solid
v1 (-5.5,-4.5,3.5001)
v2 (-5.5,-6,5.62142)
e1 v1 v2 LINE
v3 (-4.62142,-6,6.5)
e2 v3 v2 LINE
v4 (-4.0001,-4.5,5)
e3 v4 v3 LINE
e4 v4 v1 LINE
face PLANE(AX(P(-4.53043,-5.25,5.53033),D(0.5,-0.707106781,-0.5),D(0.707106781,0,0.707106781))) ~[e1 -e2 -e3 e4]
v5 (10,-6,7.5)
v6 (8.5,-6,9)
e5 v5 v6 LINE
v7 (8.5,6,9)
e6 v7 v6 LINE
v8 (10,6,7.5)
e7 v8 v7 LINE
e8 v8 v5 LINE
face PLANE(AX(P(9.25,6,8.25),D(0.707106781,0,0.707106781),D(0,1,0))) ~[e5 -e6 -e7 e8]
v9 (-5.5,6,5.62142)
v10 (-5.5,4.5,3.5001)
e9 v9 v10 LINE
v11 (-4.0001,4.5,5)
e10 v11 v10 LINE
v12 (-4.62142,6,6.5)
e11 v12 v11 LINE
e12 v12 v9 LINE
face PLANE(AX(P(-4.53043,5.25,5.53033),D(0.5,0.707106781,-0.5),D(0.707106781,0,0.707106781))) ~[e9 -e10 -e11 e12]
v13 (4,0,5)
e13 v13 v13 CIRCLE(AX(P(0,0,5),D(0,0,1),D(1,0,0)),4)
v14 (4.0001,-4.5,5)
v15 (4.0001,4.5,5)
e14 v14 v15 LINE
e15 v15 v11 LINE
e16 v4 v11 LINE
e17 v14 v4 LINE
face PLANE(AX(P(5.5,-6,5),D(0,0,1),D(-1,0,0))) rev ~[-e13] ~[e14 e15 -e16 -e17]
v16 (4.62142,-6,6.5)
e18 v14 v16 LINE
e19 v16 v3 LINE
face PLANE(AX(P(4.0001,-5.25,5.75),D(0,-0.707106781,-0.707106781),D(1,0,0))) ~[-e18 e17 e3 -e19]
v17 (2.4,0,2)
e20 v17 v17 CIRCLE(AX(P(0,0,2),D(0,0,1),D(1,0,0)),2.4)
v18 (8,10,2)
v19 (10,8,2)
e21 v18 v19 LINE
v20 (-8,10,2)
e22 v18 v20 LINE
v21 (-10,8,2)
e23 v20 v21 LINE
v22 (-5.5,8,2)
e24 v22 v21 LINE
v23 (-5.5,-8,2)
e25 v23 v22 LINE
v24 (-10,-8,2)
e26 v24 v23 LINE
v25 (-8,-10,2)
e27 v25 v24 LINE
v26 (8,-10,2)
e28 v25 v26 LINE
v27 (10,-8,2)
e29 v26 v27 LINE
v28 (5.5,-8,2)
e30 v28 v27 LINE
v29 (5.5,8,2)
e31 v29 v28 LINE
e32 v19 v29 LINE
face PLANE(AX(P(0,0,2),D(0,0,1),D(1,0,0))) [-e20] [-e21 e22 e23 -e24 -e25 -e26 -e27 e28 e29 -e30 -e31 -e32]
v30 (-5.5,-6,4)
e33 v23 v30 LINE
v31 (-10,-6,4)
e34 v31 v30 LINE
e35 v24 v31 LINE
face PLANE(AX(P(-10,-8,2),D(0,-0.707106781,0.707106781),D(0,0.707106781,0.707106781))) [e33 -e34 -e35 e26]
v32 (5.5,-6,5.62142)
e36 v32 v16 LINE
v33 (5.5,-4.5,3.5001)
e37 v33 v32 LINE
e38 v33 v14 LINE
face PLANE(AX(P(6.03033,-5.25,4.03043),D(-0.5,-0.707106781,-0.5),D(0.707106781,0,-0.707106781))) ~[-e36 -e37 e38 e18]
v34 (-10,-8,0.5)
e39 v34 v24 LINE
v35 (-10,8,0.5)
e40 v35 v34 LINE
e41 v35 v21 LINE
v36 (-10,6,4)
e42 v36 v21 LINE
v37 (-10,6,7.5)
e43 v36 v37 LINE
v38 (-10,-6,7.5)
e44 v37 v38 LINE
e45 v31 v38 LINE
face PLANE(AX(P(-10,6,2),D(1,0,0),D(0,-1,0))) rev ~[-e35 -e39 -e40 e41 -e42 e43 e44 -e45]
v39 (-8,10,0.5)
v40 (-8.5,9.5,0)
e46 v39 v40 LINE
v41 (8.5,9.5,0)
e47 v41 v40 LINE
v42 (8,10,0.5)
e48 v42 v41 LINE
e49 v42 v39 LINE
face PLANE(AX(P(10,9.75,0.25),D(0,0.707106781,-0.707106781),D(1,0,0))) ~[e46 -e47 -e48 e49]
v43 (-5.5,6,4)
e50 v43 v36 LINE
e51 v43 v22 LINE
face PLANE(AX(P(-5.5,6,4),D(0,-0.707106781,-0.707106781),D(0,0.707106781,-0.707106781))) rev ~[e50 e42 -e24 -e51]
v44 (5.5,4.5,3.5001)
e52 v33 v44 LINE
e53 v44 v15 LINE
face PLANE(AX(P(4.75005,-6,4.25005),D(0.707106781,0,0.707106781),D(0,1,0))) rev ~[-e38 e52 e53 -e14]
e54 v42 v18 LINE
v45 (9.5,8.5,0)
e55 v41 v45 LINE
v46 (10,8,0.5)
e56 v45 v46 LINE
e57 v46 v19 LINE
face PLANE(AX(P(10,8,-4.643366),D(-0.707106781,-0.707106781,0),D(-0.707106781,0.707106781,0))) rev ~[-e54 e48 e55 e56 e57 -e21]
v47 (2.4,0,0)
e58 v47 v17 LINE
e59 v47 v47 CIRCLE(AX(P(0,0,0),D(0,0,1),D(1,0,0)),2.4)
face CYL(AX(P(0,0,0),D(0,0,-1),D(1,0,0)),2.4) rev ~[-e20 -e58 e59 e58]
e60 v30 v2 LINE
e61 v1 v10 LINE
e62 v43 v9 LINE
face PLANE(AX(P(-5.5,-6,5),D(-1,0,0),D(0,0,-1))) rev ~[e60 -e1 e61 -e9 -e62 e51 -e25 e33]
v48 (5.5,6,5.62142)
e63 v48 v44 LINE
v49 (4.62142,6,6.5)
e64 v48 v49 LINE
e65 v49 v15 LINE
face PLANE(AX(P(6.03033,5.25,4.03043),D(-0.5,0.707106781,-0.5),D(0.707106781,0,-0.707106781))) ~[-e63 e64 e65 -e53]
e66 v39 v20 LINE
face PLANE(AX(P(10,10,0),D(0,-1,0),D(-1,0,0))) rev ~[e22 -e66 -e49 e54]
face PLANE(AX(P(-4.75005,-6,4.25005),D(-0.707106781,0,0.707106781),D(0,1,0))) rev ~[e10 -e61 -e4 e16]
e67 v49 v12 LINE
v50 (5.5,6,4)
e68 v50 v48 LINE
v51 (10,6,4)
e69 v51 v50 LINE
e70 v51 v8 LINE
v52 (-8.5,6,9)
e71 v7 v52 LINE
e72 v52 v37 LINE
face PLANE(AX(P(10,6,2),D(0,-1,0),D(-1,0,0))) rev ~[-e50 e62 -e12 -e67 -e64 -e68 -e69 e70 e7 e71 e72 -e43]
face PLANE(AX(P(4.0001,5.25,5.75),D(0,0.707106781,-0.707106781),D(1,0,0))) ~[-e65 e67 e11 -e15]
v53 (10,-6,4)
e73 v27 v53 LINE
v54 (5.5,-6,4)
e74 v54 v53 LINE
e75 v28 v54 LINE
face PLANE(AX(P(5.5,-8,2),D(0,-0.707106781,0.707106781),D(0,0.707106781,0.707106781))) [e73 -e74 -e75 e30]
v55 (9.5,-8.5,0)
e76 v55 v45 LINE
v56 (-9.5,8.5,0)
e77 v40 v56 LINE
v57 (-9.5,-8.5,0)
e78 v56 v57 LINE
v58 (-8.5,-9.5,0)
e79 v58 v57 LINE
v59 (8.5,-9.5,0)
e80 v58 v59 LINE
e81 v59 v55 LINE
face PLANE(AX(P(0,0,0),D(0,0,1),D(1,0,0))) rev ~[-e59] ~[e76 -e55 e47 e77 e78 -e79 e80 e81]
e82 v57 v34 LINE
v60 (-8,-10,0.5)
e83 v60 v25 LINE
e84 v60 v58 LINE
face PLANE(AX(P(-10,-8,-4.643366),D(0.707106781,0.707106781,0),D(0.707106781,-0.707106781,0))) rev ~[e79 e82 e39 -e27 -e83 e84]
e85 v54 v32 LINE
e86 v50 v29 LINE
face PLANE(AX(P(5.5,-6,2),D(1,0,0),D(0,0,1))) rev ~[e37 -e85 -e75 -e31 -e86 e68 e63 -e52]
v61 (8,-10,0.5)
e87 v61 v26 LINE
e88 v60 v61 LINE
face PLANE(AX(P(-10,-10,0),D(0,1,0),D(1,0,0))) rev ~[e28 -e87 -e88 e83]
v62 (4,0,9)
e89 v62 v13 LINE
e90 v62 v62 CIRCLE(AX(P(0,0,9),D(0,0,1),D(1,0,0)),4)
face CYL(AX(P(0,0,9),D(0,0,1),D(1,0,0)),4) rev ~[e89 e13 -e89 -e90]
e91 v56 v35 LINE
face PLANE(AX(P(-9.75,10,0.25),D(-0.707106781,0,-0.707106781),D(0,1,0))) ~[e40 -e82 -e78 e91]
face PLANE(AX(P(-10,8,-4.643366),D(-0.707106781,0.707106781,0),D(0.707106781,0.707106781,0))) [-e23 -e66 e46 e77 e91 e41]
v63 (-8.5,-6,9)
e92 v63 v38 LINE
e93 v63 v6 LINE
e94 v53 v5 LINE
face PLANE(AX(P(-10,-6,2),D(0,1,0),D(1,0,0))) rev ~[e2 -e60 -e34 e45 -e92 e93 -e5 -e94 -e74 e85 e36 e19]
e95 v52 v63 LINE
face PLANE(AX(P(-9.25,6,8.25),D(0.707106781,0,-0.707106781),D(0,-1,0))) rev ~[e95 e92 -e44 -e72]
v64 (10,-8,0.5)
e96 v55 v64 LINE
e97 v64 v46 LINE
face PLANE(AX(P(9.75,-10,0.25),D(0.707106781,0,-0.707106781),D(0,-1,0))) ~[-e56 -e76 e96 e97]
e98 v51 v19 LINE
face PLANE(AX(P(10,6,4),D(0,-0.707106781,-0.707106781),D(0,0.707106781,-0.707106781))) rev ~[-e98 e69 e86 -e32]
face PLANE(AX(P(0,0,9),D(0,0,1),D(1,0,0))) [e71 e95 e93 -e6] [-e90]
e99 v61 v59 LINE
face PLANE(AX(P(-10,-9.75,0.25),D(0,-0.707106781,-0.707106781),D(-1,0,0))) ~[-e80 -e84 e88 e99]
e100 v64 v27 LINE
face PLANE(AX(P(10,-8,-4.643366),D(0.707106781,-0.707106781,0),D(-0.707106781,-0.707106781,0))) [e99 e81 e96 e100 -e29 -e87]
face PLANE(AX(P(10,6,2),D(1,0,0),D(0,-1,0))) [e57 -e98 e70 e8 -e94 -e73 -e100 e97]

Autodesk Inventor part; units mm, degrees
ref_plane "YZ Plane" through (0, 0, 0) normal (1, 0, 0) x (0, 1, 0)
ref_plane "XZ Plane" through (0, 0, 0) normal (0, 1, 0) x (-1, 0, 0)
ref_plane "XY Plane" through (0, 0, 0) normal (0, 0, 1) x (1, 0, 0)
sketch "Sketch1" plane through (0, 0, 0) normal (0, 0, 1) x (1, 0, 0)
  line L0 (-10, -10) -> (10, -10)
  line L1 (10, -10) -> (10, 10)
  line L2 (10, 10) -> (-10, 10)
  line L3 (-10, 10) -> (-10, -10)
  line L4 (-10, -10) -> (10, 10) construction
  line L5 (10, -10) -> (-10, 10) construction
  circle A0 centre (0, 0) radius 2.4
  dimension "d0" = 20
  dimension "d1" = 20
  dimension "d2" = 4.8
extrude "Extrusion1" add sketch "Sketch1" along normal blind 2
chamfer "Chamfer1" distance 0.5 angle 45 4 edges at (10, 0, 0) (0, 10, 0) (-10, 0, 0) (0, -10, 0)
sketch "Sketch2" plane through (0, 0, 2) normal (0, 0, 1) x (1, 0, 0)
  line L0 (10, 10) -> (10, -10) projected
  line L1 (-10, -6) -> (10, -6)
  line L2 (10, -6) -> (10, 6)
  line L3 (10, 6) -> (-10, 6)
  line L4 (-10, 6) -> (-10, -6)
  line L5 (-10, -6) -> (10, 6) construction
  line L6 (10, -6) -> (-10, 6) construction
  point P0 (0, 0)
  point P1 (10, -6)
  dimension "d8" = 12
extrude "Extrusion2" add sketch "Sketch2" along normal blind 7
sketch "Sketch5" plane through (-10, -6, 2) normal (0, -1, 0) x (1, 0, 0)
  line L0 (20, 0) -> (0, 0) projected
  line L1 (4.5, 0) -> (15.5, 0)
  line L2 (15.5, 0) -> (15.5, 3)
  line L3 (15.5, 3) -> (4.5, 3)
  line L4 (4.5, 3) -> (4.5, 0)
  line L5 (0, 0) -> (0, 7) projected
  line L6 (20, 0) -> (20, 7) projected
  point P0 (10, -2)
  dimension "d18" = 3
  dimension "d19" = 4.5
  dimension "d20" = 4.5
extrude "Extrusion4" cut sketch "Sketch5" against normal through all
sketch "Sketch6" plane through (0, 0, 9) normal (0, 0, 1) x (1, 0, 0)
  circle A0 centre (0, 0) radius 2.4 construction
  circle A1 centre (0, 0) radius 4
  dimension "d23" = 8
extrude "Extrusion5" cut sketch "Sketch6" against normal up to surface (7 mm away)
chamfer "Chamfer4" distance 1.5 angle 45 2 edges at (-5.5, 0, 5) (5.5, 0, 5)
chamfer "Chamfer5" distance 1.5 angle 45 6 edges at (0, -6, 5) (0, 6, 5) (-4.75, -6, 4.25) (4.75, -6, 4.2501) (4.75, 6, 4.25) (-4.75, 6, 4.2501)
chamfer "Chamfer6" distance 1.5 angle 45 2 edges at (-10, 0, 9) (10, 0, 9)
chamfer "Chamfer7" distance 2 angle 45 8 edges at (10, 10, 1.25) (-10, 10, 1.25) (-10, -10, 1.25) (10, -10, 1.25) (7.75, -6, 2) (-7.75, -6, 2) (-7.75, 6, 2) (7.75, 6, 2)
equation "\"d20\" = d19"
properties part number "_3DPrint"
